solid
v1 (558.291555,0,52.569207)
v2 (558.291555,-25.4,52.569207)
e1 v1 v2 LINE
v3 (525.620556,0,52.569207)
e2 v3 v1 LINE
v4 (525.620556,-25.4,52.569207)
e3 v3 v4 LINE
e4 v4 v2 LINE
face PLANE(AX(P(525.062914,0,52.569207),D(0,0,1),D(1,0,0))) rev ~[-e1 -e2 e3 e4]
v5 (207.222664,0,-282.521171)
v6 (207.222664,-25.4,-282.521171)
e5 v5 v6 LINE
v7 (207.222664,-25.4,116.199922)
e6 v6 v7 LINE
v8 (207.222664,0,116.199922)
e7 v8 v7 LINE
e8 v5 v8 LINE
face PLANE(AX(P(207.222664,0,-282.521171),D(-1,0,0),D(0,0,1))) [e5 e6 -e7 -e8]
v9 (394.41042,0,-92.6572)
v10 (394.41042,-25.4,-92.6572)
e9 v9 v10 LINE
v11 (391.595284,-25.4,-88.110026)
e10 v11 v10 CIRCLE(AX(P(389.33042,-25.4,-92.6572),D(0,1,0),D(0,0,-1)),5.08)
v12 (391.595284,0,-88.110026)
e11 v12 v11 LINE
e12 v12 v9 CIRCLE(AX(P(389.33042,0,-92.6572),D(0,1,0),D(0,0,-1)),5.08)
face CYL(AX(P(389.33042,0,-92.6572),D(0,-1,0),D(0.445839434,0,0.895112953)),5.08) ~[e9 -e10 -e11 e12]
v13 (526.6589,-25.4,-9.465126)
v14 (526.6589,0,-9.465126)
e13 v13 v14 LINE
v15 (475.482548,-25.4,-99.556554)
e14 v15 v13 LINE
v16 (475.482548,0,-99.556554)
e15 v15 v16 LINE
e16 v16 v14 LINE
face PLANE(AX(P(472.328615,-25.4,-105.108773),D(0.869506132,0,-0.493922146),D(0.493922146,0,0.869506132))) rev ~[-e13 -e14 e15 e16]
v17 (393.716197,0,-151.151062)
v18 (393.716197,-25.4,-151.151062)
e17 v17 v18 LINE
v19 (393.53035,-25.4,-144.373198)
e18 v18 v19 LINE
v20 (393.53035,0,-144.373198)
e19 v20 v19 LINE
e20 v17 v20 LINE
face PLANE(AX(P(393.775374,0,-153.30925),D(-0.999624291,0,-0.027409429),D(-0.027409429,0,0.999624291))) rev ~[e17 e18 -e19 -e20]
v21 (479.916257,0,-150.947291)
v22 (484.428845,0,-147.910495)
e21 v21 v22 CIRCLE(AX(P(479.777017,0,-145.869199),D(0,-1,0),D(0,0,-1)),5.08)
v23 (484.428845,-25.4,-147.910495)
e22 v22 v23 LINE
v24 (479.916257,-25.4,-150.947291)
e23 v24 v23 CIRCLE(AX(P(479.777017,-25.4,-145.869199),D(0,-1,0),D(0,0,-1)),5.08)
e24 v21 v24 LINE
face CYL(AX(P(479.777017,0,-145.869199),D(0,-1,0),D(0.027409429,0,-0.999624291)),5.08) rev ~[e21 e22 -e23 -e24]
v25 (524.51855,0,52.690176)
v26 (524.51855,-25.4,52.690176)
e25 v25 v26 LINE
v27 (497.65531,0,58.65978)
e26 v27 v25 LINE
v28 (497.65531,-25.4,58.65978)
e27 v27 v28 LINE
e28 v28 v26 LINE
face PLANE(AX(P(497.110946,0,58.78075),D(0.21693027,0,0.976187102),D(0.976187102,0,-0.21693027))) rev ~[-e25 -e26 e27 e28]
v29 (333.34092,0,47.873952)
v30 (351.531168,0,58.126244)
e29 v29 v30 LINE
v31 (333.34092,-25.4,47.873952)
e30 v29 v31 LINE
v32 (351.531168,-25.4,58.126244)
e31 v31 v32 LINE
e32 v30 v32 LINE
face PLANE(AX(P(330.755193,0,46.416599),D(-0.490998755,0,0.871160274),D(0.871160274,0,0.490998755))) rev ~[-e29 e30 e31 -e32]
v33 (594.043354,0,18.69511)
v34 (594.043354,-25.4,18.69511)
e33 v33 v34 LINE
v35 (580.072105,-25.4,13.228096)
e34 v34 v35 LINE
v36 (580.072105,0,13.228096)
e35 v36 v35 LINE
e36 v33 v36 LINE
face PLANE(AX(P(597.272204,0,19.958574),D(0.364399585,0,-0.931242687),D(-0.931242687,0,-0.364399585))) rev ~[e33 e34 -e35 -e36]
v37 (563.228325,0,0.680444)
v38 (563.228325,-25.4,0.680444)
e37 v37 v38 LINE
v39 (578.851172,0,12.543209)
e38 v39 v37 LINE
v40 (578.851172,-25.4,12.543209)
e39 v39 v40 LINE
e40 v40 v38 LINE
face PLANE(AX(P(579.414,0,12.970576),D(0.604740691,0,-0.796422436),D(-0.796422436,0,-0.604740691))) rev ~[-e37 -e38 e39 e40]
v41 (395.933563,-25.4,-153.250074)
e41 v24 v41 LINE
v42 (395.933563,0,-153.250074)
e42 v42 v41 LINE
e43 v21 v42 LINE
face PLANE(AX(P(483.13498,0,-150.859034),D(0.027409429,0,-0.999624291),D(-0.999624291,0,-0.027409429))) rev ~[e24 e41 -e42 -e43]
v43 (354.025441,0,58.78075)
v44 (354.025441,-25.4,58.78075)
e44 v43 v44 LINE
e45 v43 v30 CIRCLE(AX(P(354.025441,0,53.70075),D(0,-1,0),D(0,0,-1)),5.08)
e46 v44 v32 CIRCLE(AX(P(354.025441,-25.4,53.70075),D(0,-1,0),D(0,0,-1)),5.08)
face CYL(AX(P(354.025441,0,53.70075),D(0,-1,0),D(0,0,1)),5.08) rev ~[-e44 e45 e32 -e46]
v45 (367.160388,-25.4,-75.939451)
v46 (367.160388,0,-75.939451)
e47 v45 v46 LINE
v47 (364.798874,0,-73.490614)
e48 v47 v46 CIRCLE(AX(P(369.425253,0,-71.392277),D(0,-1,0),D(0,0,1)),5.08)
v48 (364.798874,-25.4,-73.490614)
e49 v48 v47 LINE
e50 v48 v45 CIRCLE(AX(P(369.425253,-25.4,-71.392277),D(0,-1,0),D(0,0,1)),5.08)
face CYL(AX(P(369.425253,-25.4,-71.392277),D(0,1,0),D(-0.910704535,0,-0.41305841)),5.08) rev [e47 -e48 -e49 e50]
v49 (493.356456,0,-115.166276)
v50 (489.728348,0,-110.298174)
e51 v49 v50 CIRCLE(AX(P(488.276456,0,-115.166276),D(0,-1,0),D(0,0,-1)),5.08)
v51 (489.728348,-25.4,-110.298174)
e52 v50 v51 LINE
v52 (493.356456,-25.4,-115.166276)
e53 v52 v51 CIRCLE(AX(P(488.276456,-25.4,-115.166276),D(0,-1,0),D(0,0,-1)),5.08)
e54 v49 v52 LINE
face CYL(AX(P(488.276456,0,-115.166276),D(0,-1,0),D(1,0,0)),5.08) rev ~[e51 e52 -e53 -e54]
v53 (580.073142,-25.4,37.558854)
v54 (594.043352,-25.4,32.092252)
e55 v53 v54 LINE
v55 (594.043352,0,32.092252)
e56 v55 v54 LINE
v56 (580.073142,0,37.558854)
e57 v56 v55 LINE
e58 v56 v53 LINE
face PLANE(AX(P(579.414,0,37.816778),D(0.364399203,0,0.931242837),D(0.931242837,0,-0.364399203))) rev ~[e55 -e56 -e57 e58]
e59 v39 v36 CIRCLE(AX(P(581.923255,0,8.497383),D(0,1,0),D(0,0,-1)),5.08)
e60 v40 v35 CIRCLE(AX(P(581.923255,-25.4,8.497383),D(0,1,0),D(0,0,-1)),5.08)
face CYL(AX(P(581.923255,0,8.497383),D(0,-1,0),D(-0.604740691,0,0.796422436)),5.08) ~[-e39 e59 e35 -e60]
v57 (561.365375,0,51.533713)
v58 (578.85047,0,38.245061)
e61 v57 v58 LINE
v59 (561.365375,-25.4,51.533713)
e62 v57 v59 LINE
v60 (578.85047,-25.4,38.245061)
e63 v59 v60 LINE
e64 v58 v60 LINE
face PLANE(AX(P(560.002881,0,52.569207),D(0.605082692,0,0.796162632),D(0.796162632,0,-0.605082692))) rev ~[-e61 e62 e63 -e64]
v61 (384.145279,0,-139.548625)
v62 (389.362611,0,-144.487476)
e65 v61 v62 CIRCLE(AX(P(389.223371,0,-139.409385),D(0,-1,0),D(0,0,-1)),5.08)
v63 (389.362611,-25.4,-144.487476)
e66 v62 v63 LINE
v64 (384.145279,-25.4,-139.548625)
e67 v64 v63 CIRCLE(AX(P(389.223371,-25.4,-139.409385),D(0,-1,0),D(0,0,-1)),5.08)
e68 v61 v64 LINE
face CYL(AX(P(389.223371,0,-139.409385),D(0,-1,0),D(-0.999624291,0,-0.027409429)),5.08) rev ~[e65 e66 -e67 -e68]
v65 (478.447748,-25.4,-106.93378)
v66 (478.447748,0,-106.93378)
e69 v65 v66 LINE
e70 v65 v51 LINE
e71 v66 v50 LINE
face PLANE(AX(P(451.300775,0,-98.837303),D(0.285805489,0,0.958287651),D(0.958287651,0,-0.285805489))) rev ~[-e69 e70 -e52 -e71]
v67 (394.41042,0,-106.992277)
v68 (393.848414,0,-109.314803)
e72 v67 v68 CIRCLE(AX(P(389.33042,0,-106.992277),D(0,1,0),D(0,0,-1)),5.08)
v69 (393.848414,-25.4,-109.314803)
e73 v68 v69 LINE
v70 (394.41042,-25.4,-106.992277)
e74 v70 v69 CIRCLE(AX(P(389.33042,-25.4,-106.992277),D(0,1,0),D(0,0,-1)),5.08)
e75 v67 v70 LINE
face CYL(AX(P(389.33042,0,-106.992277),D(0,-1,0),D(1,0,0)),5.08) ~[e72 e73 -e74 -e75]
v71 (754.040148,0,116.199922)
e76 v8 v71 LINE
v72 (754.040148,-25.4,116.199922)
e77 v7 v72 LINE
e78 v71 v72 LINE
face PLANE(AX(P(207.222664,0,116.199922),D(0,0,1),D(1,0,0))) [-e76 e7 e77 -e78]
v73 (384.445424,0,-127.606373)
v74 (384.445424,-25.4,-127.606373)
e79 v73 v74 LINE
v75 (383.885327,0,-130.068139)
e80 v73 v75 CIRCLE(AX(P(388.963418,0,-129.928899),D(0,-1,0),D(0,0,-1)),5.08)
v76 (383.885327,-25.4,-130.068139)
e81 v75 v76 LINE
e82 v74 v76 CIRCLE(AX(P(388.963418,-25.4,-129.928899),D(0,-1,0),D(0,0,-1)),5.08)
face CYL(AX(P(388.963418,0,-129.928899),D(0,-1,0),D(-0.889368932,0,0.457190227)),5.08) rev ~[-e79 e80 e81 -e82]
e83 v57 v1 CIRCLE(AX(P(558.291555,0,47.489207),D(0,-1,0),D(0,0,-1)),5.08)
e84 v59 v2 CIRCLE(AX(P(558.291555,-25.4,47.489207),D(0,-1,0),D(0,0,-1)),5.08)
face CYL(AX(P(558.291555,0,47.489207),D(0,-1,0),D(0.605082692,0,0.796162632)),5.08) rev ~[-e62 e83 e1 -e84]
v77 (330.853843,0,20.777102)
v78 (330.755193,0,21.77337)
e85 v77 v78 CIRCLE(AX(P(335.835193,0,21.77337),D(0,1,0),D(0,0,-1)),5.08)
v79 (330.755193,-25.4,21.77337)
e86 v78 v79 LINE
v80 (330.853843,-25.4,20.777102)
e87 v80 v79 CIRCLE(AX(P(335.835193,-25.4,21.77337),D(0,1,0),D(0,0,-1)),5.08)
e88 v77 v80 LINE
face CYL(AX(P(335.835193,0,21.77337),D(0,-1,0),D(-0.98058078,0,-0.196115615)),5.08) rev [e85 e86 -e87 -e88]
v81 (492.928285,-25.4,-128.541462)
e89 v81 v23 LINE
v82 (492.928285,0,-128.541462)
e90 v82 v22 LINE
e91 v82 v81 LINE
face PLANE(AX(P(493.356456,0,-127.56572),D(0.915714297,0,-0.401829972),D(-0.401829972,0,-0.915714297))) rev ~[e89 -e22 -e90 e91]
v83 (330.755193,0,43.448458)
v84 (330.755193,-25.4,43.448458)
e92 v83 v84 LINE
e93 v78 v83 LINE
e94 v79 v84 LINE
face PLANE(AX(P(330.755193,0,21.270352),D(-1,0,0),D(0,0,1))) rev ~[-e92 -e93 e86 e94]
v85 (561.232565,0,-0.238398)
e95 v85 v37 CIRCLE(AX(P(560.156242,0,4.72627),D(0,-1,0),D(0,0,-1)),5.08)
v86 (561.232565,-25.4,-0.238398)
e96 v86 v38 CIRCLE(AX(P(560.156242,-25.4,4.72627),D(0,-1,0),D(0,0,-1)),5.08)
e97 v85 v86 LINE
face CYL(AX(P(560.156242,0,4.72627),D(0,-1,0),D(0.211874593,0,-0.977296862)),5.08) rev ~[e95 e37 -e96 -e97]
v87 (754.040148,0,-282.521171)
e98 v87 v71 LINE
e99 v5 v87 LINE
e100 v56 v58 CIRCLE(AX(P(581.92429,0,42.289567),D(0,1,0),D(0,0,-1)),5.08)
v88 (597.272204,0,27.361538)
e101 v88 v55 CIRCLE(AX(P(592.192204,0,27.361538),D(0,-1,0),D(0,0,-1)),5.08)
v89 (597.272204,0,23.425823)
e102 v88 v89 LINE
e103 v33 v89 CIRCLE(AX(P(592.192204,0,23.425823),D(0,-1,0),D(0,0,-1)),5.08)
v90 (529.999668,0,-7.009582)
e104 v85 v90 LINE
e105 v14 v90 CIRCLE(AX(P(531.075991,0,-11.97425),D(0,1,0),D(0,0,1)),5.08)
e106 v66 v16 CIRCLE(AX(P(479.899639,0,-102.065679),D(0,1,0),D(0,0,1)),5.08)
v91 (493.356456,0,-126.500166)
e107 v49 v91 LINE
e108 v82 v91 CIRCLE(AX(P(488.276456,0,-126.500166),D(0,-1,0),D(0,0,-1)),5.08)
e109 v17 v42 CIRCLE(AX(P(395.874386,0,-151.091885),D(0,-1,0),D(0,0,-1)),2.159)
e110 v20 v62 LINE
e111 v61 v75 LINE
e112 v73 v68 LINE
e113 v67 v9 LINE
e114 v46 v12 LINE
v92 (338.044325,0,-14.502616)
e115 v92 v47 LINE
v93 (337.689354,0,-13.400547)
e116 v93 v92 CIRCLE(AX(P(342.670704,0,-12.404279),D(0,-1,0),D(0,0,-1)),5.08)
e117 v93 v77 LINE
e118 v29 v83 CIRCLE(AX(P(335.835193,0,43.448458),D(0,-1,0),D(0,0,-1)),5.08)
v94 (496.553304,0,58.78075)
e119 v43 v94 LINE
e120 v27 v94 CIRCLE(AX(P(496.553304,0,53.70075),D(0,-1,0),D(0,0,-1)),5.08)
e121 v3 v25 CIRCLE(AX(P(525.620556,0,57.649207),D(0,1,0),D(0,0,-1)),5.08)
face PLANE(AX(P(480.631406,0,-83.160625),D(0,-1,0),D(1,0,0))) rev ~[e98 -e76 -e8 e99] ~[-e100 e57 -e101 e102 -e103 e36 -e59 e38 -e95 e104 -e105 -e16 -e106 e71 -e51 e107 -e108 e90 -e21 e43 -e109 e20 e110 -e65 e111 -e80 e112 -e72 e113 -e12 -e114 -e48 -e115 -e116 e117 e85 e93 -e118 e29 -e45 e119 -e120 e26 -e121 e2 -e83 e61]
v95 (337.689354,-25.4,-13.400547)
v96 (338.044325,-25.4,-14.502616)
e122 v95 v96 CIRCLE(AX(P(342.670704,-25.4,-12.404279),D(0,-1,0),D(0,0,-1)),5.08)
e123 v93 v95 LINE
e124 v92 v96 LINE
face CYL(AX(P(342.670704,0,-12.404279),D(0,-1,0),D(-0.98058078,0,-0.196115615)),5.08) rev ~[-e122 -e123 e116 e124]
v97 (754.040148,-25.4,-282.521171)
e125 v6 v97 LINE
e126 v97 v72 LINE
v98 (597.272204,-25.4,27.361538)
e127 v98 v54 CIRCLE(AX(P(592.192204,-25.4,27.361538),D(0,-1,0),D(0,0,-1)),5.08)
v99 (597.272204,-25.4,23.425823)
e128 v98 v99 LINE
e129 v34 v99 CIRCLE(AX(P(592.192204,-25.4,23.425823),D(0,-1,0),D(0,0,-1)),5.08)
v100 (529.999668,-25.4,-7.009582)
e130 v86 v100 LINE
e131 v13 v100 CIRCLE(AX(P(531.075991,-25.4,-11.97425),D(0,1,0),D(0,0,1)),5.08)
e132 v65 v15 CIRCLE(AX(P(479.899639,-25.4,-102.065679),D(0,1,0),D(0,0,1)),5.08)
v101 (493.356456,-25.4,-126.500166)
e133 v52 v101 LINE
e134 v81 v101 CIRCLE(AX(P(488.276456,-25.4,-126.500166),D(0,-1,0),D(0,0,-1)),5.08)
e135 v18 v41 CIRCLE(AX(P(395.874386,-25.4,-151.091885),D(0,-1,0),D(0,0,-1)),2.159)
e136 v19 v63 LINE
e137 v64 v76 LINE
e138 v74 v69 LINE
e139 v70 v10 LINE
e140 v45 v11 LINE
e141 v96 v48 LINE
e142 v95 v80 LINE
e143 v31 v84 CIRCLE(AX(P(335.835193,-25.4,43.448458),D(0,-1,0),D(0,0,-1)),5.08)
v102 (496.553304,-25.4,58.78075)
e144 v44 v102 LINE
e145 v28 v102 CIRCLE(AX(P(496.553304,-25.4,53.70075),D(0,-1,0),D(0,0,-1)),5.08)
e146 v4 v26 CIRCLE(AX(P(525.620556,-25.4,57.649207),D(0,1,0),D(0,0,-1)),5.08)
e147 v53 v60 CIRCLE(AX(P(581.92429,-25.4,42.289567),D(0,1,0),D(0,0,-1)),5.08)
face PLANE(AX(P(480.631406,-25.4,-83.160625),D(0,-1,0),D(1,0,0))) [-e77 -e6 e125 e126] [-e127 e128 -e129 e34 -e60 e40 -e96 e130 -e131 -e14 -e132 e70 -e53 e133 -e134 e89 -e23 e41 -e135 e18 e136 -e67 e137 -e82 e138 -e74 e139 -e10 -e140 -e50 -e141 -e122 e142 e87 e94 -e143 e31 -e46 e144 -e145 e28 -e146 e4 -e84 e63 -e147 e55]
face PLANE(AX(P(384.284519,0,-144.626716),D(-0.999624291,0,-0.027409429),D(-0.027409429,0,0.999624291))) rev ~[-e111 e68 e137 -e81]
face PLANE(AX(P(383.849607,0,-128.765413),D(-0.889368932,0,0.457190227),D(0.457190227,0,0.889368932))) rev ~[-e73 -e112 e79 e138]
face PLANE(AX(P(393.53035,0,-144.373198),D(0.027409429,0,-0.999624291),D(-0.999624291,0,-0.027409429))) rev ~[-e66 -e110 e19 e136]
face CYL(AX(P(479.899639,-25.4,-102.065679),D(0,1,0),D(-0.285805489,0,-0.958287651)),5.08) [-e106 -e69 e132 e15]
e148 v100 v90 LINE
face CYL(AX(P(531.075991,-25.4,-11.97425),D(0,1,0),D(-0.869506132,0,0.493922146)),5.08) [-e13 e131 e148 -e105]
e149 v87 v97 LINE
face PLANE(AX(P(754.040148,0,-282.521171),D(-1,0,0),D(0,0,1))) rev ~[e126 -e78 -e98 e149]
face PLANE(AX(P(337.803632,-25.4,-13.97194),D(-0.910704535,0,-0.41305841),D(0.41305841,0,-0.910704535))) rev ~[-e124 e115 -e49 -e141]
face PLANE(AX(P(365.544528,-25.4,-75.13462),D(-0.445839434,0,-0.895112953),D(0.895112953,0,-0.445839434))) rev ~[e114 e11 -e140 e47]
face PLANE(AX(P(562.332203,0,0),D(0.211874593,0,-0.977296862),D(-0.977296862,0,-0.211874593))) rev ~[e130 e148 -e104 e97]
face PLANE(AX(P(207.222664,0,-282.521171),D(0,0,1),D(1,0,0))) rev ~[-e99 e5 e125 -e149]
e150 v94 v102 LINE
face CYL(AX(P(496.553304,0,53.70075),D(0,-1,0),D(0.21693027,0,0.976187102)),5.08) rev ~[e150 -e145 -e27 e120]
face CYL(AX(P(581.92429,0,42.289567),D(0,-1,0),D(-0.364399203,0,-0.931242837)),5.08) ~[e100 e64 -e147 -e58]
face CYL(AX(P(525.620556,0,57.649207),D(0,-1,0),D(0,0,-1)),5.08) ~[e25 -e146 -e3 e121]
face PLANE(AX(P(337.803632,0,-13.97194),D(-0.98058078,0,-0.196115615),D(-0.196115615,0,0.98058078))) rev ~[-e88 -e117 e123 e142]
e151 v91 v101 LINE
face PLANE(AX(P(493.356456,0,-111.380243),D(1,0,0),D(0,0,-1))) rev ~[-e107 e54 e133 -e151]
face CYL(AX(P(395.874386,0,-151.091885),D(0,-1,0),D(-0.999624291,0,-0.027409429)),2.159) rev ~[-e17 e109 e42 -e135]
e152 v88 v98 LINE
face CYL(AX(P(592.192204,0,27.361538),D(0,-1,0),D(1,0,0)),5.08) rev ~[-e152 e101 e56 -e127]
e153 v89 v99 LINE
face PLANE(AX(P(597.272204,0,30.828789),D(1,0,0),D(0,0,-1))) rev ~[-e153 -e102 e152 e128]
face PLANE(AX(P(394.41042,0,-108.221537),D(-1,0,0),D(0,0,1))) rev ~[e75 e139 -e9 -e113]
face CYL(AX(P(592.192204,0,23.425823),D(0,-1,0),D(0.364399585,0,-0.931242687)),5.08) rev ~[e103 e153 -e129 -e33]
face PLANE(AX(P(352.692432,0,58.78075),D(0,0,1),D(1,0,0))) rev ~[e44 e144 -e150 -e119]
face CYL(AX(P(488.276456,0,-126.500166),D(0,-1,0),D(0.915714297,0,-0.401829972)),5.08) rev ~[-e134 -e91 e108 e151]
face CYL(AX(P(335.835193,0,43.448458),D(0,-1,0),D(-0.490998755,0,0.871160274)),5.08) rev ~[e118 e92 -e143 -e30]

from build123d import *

# Parameters (mm, degrees)
F0_W     = 546.8174844539
F0_H     = 398.7210936817
F1_DEPTH = 25.4
F3_DEPTH = 25.401
F4_R     = 5.08
F5_R     = 2.159


# Not quite as in the source:
# - a feature names something its author has since deleted; it is built from what else it names


with BuildPart() as f1:
    # F0 (on Front) → F1 (new body)
    with BuildSketch(Plane.XZ):
        with Locations((480.6314062452, -83.1606246494)):
            Rectangle(F0_W, F0_H)
        Polygon((330.755193297, 46.4165987058), (352.6924322393, 58.7807495217), (497.1109463772, 58.7807495217), (525.0629135844, 52.5692068872), (560.0028810439, 52.5692068872), (579.4140003676, 37.8167783416), (597.2722044557, 30.8287886525), (597.2722044557, 19.9585742536), (579.4140003676, 12.9705761138), (562.3322031939, 0), (493.2287427939, -14.9813921496), (476.9234201392, -48.3684665562), (464.5003348701, -54.5800176413), (451.3007750821, -98.8373032779), (493.3564558907, -111.380243164), (493.3564558907, -127.5657196522), (483.1349796749, -150.8590341088), (393.7753742012, -153.3092504783), (393.5303500451, -144.3731980569), (384.284519278, -144.626716252), (383.8496065952, -128.7654126401), (394.4104195536, -108.2215374956), (394.4104195536, -64.4587469067), (400.6219790893, -38.8361145254), (368.0113337798, -22.5307876454), (337.8036322085, -13.9719399936), (330.755193297, 21.270351746), align=None, mode=Mode.SUBTRACT)
    extrude(amount=F1_DEPTH)

    # F2 (on face) → F3 (cut, through all)
    with BuildSketch(Plane.XZ.offset(25.4)):
        Polygon((527.7804729939, -7.4906960748), (337.8036322085, -13.9719399936), (365.5445277691, -75.1346200705), (401.7401635647, -93.1630060077), (472.3286154864, -105.1087732209), align=None)
    extrude(amount=-F3_DEPTH, mode=Mode.SUBTRACT)

    # F4
    f4_edges = [f1.edges().sort_by_distance(p)[0] for p in [
        (330.755193, -12.7, 21.270352),
        (330.755193, -12.7, 46.416599),
        (352.692432, -12.7, 58.78075),
        (337.803632, -12.7, -13.97194),
        (394.41042, -12.7, -108.221537),
        (383.849607, -12.7, -128.765413),
        (384.284519, -12.7, -144.626716),
        (483.13498, -12.7, -150.859034),
        (493.356456, -12.7, -127.56572),
        (562.332203, -12.7, 0),
        (579.414, -12.7, 12.970576),
        (597.272204, -12.7, 19.958574),
        (493.356456, -12.7, -111.380243),
        (525.062914, -12.7, 52.569207),
        (560.002881, -12.7, 52.569207),
        (579.414, -12.7, 37.816778),
        (597.272204, -12.7, 30.828789),
        (497.110946, -12.7, 58.78075),
        (365.544528, -12.7, -75.13462),
        (472.328615, -12.7, -105.108773),
        (394.41042, -12.7, -89.512194),
        (527.780473, -12.7, -7.490696),
    ]]
    fillet(f4_edges, radius=F4_R)

    # F5
    f5_edges = [f1.edges().sort_by_distance(p)[0] for p in [
        (393.775374, -12.7, -153.30925),
    ]]
    fillet(f5_edges, radius=F5_R)


solid = f1.part
